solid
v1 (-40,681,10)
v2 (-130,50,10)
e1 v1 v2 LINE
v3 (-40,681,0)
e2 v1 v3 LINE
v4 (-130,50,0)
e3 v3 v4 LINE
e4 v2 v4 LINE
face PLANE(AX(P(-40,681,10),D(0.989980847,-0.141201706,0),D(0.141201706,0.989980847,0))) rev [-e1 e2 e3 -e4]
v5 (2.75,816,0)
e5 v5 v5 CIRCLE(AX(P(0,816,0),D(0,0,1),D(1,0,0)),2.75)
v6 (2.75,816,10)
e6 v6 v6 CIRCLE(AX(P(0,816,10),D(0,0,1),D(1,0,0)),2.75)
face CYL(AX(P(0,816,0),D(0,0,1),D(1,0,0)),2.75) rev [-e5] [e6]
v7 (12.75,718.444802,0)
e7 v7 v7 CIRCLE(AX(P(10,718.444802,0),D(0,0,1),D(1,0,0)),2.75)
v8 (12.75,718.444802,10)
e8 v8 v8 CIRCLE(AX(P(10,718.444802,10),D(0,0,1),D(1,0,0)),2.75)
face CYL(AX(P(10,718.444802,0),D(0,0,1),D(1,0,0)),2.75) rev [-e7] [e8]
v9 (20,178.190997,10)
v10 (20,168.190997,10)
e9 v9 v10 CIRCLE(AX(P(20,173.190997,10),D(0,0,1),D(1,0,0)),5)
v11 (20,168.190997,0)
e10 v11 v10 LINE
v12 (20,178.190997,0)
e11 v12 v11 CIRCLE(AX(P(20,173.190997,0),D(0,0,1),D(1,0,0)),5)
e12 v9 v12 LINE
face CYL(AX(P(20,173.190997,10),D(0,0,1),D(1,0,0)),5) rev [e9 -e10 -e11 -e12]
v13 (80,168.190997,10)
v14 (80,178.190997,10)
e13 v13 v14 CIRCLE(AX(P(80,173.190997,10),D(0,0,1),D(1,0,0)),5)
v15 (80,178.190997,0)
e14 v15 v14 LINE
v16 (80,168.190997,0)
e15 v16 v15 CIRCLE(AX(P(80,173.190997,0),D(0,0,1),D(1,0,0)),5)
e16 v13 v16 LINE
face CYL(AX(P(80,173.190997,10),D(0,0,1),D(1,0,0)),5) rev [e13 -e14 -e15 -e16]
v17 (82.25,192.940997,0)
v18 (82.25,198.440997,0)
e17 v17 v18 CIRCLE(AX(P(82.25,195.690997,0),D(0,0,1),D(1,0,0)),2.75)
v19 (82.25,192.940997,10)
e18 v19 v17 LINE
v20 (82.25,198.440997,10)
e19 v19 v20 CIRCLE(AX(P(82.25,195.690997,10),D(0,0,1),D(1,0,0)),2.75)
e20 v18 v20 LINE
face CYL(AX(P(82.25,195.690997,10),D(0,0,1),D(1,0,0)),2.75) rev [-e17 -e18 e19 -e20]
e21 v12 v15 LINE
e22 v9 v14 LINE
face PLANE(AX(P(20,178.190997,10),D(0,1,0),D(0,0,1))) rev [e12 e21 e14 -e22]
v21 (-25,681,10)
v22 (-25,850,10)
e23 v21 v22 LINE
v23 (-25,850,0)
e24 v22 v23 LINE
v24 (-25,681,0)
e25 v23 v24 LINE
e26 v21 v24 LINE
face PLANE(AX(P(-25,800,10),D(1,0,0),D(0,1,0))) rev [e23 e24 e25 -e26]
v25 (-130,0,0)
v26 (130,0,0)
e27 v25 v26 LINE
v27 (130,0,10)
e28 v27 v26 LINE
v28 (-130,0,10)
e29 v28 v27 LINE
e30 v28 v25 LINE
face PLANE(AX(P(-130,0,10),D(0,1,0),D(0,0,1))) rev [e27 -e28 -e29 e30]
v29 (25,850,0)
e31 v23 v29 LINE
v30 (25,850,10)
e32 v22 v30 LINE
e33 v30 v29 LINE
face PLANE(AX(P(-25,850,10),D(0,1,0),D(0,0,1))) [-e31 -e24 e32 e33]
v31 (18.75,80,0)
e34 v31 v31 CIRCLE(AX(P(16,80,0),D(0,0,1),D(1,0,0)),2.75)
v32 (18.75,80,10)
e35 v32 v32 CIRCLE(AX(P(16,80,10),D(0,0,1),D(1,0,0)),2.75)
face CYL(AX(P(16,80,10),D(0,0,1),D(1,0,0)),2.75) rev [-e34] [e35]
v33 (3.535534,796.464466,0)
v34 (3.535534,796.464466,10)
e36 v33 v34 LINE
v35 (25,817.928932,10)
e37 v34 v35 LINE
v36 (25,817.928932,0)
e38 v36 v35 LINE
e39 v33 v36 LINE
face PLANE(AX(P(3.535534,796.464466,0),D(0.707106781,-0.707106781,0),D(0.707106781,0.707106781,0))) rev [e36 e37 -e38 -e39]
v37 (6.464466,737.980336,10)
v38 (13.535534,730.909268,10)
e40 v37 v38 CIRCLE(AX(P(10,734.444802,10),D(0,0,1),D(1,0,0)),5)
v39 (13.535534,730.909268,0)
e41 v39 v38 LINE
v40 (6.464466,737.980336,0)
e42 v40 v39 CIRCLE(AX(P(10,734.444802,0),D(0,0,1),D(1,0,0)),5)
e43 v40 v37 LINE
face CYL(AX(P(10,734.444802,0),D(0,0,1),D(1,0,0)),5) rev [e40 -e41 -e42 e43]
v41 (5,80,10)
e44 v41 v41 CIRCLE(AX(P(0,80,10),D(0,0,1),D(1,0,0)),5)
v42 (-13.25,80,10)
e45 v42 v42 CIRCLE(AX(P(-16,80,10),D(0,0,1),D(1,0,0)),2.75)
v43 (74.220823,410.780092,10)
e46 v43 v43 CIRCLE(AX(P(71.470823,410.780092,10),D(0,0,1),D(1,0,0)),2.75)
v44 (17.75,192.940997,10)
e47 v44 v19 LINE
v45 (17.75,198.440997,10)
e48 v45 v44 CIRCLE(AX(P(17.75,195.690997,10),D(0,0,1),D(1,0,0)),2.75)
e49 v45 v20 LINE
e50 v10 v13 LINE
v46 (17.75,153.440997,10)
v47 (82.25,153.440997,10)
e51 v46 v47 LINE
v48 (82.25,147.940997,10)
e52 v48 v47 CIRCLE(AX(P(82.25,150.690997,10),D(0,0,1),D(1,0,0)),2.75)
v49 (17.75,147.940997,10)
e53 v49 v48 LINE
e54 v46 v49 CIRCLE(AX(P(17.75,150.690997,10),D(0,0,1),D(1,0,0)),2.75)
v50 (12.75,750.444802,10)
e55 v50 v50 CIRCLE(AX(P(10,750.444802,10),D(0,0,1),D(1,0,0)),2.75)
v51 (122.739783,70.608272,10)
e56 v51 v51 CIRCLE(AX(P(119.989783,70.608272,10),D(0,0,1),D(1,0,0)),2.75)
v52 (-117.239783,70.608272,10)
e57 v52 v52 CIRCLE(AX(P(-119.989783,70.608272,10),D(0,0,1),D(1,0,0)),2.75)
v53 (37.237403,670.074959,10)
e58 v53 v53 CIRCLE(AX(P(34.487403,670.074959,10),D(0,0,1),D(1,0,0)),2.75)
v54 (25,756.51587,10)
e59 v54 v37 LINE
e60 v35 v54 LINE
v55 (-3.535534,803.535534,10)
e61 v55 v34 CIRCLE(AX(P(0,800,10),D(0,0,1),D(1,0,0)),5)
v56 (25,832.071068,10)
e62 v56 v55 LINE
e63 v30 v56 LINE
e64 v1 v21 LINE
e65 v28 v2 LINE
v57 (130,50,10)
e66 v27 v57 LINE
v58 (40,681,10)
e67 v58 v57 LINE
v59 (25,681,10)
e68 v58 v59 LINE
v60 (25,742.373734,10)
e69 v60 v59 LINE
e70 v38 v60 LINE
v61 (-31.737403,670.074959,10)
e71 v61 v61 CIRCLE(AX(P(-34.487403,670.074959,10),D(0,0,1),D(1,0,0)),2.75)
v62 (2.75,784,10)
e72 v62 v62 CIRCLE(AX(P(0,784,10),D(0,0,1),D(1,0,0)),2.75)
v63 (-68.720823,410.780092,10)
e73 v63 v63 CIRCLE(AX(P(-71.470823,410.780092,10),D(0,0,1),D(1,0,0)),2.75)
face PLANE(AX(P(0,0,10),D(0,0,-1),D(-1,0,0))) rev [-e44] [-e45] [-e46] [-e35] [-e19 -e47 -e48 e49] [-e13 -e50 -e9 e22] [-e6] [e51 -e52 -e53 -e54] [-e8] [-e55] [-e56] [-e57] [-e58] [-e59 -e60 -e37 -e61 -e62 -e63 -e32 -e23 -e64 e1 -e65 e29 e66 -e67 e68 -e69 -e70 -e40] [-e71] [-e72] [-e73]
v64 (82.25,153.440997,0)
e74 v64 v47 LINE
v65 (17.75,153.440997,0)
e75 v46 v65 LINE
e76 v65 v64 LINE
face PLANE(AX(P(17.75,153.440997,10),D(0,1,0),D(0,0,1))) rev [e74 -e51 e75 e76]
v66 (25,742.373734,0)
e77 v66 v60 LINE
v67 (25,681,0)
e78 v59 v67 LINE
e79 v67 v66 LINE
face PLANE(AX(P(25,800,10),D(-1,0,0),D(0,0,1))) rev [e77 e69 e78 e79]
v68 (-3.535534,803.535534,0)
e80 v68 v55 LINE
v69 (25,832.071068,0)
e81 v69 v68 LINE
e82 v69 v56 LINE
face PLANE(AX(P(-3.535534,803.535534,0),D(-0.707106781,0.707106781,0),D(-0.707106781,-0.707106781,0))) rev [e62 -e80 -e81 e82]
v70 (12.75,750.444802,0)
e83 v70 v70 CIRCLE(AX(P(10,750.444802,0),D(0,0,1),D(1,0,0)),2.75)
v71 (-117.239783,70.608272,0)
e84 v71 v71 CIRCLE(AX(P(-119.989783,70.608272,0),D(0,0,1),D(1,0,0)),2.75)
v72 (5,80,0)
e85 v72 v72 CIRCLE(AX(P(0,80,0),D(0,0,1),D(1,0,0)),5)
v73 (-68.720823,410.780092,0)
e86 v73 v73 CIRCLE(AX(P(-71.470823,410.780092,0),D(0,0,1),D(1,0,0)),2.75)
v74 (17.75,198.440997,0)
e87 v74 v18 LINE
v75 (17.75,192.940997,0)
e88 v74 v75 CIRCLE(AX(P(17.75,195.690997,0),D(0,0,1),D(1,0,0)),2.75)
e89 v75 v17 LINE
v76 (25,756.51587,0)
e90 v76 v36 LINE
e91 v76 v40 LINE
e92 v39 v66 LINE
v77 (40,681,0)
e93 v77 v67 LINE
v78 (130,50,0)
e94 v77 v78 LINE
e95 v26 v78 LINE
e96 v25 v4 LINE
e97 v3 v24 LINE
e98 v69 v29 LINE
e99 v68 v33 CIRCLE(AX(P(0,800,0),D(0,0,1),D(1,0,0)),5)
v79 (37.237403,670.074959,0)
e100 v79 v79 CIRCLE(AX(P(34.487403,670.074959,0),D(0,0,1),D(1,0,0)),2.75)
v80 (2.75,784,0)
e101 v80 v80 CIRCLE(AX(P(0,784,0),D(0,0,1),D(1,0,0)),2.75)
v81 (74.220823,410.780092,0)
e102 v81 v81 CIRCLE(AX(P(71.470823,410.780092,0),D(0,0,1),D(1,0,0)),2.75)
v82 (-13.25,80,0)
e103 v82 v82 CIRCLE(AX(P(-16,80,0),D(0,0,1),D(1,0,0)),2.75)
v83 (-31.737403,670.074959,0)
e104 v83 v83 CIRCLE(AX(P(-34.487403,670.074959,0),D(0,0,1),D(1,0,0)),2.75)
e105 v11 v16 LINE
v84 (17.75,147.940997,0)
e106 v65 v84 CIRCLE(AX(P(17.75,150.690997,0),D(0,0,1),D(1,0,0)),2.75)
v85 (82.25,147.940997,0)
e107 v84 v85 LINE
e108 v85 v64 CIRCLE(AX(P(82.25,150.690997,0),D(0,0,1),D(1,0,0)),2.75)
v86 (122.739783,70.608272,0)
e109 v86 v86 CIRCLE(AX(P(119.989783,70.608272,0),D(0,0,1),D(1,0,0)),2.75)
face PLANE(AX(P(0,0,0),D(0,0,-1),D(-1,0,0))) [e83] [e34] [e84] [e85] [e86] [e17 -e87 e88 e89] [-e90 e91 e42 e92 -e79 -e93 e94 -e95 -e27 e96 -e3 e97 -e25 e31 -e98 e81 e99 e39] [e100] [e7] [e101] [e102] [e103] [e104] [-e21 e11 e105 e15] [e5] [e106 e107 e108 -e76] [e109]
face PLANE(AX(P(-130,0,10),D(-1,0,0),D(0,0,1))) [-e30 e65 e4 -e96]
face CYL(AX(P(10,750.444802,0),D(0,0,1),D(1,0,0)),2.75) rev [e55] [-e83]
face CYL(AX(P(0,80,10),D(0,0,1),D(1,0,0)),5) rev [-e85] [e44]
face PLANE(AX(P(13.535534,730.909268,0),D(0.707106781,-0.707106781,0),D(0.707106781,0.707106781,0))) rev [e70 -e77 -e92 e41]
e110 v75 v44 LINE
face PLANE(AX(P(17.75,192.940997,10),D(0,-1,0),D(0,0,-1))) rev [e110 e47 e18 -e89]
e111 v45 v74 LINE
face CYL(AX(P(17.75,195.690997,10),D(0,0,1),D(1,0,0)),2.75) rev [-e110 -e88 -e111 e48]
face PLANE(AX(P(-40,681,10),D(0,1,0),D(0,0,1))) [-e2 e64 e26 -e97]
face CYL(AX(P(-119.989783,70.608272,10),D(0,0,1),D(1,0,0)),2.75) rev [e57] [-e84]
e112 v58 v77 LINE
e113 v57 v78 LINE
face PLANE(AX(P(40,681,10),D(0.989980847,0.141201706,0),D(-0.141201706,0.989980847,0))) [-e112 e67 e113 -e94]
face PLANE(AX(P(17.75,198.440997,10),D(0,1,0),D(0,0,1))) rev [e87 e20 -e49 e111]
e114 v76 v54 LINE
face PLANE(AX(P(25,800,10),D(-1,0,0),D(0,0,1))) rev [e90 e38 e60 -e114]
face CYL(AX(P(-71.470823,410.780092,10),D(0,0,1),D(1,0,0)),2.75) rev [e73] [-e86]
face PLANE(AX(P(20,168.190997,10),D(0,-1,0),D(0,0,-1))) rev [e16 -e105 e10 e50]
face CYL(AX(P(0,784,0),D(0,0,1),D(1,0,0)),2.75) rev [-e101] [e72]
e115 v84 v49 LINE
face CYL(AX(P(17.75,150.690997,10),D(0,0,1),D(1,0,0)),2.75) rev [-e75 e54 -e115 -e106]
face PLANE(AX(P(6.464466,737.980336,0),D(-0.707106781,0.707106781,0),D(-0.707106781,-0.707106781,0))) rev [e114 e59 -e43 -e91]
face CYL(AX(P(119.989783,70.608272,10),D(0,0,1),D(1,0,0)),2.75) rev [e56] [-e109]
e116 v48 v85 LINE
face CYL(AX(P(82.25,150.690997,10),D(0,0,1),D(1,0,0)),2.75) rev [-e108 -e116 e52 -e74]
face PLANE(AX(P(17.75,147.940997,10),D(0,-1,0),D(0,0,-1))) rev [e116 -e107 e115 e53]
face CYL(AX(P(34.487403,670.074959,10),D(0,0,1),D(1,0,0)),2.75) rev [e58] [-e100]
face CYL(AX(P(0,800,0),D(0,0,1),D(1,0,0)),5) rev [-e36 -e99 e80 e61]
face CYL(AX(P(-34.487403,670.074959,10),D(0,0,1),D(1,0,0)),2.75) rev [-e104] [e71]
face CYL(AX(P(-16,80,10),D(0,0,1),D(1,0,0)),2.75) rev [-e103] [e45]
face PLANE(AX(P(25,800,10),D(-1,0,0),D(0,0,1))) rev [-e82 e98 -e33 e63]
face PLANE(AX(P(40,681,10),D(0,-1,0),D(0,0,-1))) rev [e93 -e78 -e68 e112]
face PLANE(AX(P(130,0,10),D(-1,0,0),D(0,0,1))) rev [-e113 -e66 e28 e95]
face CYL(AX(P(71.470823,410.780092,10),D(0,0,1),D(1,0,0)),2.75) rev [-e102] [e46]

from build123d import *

# Parameters (mm, degrees)
AUFSATZ_LINEAR_AUSTRAGEN1_DEPTH       = 10
SKIZZE17_R                            = 2.75
SCHNITT_LINEAR_AUSTRAGEN1_DEPTH       = 10
F_10_0_10_DURCHMESSER_BOHRUNG1_D      = 10
F_5_5_5_5_DURCHMESSER_BOHRUNG2_D      = 5.5
F_10_0_10_DURCHMESSER_LANGLOCH2_DEPTH = 10
F_5_5_5_5_DURCHMESSER_LANGLOCH2_DEPTH = 10
F_5_5_5_5_DURCHMESSER_BOHRUNG3_D      = 5.5


# Read off the part's stored shape, not the designer's step: Ø10.0 (10) Durchmesser Langloch2, Ø5.5 (5.5) Durchmesser Langloch2
with BuildPart() as part:
    # Skizze1 → Aufsatz-Linear austragen1 (new body)
    with BuildSketch(Plane.XY):
        Polygon((-40, 681), (-130, 50), (-130, 0), (0, 0), (0, 800), (0, 850), (-25, 850), (-25, 800), (-25, 681), align=None)
    aufsatz_linear_austragen1 = extrude(amount=AUFSATZ_LINEAR_AUSTRAGEN1_DEPTH)

    # Spiegeln1: Aufsatz-Linear austragen1 across plane
    add(aufsatz_linear_austragen1.mirror(Plane(origin=(0, 800, 10), x_dir=(0, 0, 1), z_dir=(1, 0, 0))))

    # Skizze17 → Schnitt-Linear austragen1 (cut)
    with BuildSketch(Plane.XY.offset(10)):
        with Locations((0, 816)):
            Circle(SKIZZE17_R)
        with Locations((0, 784)):
            Circle(SKIZZE17_R)
        with Locations((10, 750.444801834)):
            Circle(SKIZZE17_R)
        with Locations((10, 718.444801834)):
            Circle(SKIZZE17_R)
        with BuildLine():
            Line((-3.535533906, 803.535533906), (25, 832.071067812))
            ThreePointArc((25, 832.071067812), (32.071067812, 832.071067812), (32.071067812, 825))
            Line((32.071067812, 825), (3.535533906, 796.464466094))
            ThreePointArc((3.535533906, 796.464466094), (-3.535533906, 796.464466094), (-3.535533906, 803.535533906))
        make_face()
        with BuildLine():
            Line((6.464466094, 737.98033574), (25, 756.515869646))
            ThreePointArc((25, 756.515869646), (32.071067812, 756.515869646), (32.071067812, 749.444801834))
            Line((32.071067812, 749.444801834), (13.535533906, 730.909267928))
            ThreePointArc((13.535533906, 730.909267928), (6.464466094, 730.909267928), (6.464466094, 737.98033574))
        make_face()
    extrude(amount=-SCHNITT_LINEAR_AUSTRAGEN1_DEPTH, mode=Mode.SUBTRACT)

    # Ø10.0 (10) Durchmesser Bohrung1 (through all)
    with Locations(Plane.XY.offset(10)):
        with Locations((0, 80)):
            Hole(F_10_0_10_DURCHMESSER_BOHRUNG1_D / 2)

    # Ø5.5 (5.5) Durchmesser Bohrung2 (through all)
    with Locations(Plane.XY.offset(10)):
        with Locations((-16, 80), (16, 80)):
            Hole(F_5_5_5_5_DURCHMESSER_BOHRUNG2_D / 2)

    # Ø10.0 (10) Durchmesser Langloch2 outline → Ø10.0 (10) Durchmesser Langloch2 (cut)
    with BuildSketch(Plane.XY):
        with BuildLine():
            Line((20, 168.190997141), (80, 168.190997141))
            ThreePointArc((80, 168.190997141), (85, 173.190997141), (80, 178.190997141))
            Line((80, 178.190997141), (20, 178.190997141))
            ThreePointArc((20, 178.190997141), (15, 173.190997141), (20, 168.190997141))
        make_face()
    extrude(amount=F_10_0_10_DURCHMESSER_LANGLOCH2_DEPTH, mode=Mode.SUBTRACT)

    # Ø5.5 (5.5) Durchmesser Langloch2 outline → Ø5.5 (5.5) Durchmesser Langloch2 (cut)
    with BuildSketch(Plane.XY):
        with BuildLine():
            Line((17.75, 147.940997141), (82.25, 147.940997141))
            ThreePointArc((82.25, 147.940997141), (85, 150.690997141), (82.25, 153.440997141))
            Line((82.25, 153.440997141), (17.75, 153.440997141))
            ThreePointArc((17.75, 153.440997141), (15, 150.690997141), (17.75, 147.940997141))
        make_face()
        with BuildLine():
            Line((17.75, 192.940997141), (82.25, 192.940997141))
            ThreePointArc((82.25, 192.940997141), (85, 195.690997141), (82.25, 198.440997141))
            Line((82.25, 198.440997141), (17.75, 198.440997141))
            ThreePointArc((17.75, 198.440997141), (15, 195.690997141), (17.75, 192.940997141))
        make_face()
    extrude(amount=F_5_5_5_5_DURCHMESSER_LANGLOCH2_DEPTH, mode=Mode.SUBTRACT)

    # Ø5.5 (5.5) Durchmesser Bohrung3 (through all)
    with Locations(Plane.XY.offset(10)):
        with Locations((-34.48740284, 670.074959222), (-71.470822821, 410.780092469), (-119.989782887, 70.608272452)):
            f_5_5_5_5_durchmesser_bohrung3 = Hole(F_5_5_5_5_DURCHMESSER_BOHRUNG3_D / 2)

    # Spiegeln2: Ø5.5 (5.5) Durchmesser Bohrung3 across plane
    add(f_5_5_5_5_durchmesser_bohrung3.mirror(Plane(origin=(0, 0, 0), x_dir=(0, 0, 1), z_dir=(1, 0, 0))), mode=Mode.SUBTRACT)


solid = part.part
